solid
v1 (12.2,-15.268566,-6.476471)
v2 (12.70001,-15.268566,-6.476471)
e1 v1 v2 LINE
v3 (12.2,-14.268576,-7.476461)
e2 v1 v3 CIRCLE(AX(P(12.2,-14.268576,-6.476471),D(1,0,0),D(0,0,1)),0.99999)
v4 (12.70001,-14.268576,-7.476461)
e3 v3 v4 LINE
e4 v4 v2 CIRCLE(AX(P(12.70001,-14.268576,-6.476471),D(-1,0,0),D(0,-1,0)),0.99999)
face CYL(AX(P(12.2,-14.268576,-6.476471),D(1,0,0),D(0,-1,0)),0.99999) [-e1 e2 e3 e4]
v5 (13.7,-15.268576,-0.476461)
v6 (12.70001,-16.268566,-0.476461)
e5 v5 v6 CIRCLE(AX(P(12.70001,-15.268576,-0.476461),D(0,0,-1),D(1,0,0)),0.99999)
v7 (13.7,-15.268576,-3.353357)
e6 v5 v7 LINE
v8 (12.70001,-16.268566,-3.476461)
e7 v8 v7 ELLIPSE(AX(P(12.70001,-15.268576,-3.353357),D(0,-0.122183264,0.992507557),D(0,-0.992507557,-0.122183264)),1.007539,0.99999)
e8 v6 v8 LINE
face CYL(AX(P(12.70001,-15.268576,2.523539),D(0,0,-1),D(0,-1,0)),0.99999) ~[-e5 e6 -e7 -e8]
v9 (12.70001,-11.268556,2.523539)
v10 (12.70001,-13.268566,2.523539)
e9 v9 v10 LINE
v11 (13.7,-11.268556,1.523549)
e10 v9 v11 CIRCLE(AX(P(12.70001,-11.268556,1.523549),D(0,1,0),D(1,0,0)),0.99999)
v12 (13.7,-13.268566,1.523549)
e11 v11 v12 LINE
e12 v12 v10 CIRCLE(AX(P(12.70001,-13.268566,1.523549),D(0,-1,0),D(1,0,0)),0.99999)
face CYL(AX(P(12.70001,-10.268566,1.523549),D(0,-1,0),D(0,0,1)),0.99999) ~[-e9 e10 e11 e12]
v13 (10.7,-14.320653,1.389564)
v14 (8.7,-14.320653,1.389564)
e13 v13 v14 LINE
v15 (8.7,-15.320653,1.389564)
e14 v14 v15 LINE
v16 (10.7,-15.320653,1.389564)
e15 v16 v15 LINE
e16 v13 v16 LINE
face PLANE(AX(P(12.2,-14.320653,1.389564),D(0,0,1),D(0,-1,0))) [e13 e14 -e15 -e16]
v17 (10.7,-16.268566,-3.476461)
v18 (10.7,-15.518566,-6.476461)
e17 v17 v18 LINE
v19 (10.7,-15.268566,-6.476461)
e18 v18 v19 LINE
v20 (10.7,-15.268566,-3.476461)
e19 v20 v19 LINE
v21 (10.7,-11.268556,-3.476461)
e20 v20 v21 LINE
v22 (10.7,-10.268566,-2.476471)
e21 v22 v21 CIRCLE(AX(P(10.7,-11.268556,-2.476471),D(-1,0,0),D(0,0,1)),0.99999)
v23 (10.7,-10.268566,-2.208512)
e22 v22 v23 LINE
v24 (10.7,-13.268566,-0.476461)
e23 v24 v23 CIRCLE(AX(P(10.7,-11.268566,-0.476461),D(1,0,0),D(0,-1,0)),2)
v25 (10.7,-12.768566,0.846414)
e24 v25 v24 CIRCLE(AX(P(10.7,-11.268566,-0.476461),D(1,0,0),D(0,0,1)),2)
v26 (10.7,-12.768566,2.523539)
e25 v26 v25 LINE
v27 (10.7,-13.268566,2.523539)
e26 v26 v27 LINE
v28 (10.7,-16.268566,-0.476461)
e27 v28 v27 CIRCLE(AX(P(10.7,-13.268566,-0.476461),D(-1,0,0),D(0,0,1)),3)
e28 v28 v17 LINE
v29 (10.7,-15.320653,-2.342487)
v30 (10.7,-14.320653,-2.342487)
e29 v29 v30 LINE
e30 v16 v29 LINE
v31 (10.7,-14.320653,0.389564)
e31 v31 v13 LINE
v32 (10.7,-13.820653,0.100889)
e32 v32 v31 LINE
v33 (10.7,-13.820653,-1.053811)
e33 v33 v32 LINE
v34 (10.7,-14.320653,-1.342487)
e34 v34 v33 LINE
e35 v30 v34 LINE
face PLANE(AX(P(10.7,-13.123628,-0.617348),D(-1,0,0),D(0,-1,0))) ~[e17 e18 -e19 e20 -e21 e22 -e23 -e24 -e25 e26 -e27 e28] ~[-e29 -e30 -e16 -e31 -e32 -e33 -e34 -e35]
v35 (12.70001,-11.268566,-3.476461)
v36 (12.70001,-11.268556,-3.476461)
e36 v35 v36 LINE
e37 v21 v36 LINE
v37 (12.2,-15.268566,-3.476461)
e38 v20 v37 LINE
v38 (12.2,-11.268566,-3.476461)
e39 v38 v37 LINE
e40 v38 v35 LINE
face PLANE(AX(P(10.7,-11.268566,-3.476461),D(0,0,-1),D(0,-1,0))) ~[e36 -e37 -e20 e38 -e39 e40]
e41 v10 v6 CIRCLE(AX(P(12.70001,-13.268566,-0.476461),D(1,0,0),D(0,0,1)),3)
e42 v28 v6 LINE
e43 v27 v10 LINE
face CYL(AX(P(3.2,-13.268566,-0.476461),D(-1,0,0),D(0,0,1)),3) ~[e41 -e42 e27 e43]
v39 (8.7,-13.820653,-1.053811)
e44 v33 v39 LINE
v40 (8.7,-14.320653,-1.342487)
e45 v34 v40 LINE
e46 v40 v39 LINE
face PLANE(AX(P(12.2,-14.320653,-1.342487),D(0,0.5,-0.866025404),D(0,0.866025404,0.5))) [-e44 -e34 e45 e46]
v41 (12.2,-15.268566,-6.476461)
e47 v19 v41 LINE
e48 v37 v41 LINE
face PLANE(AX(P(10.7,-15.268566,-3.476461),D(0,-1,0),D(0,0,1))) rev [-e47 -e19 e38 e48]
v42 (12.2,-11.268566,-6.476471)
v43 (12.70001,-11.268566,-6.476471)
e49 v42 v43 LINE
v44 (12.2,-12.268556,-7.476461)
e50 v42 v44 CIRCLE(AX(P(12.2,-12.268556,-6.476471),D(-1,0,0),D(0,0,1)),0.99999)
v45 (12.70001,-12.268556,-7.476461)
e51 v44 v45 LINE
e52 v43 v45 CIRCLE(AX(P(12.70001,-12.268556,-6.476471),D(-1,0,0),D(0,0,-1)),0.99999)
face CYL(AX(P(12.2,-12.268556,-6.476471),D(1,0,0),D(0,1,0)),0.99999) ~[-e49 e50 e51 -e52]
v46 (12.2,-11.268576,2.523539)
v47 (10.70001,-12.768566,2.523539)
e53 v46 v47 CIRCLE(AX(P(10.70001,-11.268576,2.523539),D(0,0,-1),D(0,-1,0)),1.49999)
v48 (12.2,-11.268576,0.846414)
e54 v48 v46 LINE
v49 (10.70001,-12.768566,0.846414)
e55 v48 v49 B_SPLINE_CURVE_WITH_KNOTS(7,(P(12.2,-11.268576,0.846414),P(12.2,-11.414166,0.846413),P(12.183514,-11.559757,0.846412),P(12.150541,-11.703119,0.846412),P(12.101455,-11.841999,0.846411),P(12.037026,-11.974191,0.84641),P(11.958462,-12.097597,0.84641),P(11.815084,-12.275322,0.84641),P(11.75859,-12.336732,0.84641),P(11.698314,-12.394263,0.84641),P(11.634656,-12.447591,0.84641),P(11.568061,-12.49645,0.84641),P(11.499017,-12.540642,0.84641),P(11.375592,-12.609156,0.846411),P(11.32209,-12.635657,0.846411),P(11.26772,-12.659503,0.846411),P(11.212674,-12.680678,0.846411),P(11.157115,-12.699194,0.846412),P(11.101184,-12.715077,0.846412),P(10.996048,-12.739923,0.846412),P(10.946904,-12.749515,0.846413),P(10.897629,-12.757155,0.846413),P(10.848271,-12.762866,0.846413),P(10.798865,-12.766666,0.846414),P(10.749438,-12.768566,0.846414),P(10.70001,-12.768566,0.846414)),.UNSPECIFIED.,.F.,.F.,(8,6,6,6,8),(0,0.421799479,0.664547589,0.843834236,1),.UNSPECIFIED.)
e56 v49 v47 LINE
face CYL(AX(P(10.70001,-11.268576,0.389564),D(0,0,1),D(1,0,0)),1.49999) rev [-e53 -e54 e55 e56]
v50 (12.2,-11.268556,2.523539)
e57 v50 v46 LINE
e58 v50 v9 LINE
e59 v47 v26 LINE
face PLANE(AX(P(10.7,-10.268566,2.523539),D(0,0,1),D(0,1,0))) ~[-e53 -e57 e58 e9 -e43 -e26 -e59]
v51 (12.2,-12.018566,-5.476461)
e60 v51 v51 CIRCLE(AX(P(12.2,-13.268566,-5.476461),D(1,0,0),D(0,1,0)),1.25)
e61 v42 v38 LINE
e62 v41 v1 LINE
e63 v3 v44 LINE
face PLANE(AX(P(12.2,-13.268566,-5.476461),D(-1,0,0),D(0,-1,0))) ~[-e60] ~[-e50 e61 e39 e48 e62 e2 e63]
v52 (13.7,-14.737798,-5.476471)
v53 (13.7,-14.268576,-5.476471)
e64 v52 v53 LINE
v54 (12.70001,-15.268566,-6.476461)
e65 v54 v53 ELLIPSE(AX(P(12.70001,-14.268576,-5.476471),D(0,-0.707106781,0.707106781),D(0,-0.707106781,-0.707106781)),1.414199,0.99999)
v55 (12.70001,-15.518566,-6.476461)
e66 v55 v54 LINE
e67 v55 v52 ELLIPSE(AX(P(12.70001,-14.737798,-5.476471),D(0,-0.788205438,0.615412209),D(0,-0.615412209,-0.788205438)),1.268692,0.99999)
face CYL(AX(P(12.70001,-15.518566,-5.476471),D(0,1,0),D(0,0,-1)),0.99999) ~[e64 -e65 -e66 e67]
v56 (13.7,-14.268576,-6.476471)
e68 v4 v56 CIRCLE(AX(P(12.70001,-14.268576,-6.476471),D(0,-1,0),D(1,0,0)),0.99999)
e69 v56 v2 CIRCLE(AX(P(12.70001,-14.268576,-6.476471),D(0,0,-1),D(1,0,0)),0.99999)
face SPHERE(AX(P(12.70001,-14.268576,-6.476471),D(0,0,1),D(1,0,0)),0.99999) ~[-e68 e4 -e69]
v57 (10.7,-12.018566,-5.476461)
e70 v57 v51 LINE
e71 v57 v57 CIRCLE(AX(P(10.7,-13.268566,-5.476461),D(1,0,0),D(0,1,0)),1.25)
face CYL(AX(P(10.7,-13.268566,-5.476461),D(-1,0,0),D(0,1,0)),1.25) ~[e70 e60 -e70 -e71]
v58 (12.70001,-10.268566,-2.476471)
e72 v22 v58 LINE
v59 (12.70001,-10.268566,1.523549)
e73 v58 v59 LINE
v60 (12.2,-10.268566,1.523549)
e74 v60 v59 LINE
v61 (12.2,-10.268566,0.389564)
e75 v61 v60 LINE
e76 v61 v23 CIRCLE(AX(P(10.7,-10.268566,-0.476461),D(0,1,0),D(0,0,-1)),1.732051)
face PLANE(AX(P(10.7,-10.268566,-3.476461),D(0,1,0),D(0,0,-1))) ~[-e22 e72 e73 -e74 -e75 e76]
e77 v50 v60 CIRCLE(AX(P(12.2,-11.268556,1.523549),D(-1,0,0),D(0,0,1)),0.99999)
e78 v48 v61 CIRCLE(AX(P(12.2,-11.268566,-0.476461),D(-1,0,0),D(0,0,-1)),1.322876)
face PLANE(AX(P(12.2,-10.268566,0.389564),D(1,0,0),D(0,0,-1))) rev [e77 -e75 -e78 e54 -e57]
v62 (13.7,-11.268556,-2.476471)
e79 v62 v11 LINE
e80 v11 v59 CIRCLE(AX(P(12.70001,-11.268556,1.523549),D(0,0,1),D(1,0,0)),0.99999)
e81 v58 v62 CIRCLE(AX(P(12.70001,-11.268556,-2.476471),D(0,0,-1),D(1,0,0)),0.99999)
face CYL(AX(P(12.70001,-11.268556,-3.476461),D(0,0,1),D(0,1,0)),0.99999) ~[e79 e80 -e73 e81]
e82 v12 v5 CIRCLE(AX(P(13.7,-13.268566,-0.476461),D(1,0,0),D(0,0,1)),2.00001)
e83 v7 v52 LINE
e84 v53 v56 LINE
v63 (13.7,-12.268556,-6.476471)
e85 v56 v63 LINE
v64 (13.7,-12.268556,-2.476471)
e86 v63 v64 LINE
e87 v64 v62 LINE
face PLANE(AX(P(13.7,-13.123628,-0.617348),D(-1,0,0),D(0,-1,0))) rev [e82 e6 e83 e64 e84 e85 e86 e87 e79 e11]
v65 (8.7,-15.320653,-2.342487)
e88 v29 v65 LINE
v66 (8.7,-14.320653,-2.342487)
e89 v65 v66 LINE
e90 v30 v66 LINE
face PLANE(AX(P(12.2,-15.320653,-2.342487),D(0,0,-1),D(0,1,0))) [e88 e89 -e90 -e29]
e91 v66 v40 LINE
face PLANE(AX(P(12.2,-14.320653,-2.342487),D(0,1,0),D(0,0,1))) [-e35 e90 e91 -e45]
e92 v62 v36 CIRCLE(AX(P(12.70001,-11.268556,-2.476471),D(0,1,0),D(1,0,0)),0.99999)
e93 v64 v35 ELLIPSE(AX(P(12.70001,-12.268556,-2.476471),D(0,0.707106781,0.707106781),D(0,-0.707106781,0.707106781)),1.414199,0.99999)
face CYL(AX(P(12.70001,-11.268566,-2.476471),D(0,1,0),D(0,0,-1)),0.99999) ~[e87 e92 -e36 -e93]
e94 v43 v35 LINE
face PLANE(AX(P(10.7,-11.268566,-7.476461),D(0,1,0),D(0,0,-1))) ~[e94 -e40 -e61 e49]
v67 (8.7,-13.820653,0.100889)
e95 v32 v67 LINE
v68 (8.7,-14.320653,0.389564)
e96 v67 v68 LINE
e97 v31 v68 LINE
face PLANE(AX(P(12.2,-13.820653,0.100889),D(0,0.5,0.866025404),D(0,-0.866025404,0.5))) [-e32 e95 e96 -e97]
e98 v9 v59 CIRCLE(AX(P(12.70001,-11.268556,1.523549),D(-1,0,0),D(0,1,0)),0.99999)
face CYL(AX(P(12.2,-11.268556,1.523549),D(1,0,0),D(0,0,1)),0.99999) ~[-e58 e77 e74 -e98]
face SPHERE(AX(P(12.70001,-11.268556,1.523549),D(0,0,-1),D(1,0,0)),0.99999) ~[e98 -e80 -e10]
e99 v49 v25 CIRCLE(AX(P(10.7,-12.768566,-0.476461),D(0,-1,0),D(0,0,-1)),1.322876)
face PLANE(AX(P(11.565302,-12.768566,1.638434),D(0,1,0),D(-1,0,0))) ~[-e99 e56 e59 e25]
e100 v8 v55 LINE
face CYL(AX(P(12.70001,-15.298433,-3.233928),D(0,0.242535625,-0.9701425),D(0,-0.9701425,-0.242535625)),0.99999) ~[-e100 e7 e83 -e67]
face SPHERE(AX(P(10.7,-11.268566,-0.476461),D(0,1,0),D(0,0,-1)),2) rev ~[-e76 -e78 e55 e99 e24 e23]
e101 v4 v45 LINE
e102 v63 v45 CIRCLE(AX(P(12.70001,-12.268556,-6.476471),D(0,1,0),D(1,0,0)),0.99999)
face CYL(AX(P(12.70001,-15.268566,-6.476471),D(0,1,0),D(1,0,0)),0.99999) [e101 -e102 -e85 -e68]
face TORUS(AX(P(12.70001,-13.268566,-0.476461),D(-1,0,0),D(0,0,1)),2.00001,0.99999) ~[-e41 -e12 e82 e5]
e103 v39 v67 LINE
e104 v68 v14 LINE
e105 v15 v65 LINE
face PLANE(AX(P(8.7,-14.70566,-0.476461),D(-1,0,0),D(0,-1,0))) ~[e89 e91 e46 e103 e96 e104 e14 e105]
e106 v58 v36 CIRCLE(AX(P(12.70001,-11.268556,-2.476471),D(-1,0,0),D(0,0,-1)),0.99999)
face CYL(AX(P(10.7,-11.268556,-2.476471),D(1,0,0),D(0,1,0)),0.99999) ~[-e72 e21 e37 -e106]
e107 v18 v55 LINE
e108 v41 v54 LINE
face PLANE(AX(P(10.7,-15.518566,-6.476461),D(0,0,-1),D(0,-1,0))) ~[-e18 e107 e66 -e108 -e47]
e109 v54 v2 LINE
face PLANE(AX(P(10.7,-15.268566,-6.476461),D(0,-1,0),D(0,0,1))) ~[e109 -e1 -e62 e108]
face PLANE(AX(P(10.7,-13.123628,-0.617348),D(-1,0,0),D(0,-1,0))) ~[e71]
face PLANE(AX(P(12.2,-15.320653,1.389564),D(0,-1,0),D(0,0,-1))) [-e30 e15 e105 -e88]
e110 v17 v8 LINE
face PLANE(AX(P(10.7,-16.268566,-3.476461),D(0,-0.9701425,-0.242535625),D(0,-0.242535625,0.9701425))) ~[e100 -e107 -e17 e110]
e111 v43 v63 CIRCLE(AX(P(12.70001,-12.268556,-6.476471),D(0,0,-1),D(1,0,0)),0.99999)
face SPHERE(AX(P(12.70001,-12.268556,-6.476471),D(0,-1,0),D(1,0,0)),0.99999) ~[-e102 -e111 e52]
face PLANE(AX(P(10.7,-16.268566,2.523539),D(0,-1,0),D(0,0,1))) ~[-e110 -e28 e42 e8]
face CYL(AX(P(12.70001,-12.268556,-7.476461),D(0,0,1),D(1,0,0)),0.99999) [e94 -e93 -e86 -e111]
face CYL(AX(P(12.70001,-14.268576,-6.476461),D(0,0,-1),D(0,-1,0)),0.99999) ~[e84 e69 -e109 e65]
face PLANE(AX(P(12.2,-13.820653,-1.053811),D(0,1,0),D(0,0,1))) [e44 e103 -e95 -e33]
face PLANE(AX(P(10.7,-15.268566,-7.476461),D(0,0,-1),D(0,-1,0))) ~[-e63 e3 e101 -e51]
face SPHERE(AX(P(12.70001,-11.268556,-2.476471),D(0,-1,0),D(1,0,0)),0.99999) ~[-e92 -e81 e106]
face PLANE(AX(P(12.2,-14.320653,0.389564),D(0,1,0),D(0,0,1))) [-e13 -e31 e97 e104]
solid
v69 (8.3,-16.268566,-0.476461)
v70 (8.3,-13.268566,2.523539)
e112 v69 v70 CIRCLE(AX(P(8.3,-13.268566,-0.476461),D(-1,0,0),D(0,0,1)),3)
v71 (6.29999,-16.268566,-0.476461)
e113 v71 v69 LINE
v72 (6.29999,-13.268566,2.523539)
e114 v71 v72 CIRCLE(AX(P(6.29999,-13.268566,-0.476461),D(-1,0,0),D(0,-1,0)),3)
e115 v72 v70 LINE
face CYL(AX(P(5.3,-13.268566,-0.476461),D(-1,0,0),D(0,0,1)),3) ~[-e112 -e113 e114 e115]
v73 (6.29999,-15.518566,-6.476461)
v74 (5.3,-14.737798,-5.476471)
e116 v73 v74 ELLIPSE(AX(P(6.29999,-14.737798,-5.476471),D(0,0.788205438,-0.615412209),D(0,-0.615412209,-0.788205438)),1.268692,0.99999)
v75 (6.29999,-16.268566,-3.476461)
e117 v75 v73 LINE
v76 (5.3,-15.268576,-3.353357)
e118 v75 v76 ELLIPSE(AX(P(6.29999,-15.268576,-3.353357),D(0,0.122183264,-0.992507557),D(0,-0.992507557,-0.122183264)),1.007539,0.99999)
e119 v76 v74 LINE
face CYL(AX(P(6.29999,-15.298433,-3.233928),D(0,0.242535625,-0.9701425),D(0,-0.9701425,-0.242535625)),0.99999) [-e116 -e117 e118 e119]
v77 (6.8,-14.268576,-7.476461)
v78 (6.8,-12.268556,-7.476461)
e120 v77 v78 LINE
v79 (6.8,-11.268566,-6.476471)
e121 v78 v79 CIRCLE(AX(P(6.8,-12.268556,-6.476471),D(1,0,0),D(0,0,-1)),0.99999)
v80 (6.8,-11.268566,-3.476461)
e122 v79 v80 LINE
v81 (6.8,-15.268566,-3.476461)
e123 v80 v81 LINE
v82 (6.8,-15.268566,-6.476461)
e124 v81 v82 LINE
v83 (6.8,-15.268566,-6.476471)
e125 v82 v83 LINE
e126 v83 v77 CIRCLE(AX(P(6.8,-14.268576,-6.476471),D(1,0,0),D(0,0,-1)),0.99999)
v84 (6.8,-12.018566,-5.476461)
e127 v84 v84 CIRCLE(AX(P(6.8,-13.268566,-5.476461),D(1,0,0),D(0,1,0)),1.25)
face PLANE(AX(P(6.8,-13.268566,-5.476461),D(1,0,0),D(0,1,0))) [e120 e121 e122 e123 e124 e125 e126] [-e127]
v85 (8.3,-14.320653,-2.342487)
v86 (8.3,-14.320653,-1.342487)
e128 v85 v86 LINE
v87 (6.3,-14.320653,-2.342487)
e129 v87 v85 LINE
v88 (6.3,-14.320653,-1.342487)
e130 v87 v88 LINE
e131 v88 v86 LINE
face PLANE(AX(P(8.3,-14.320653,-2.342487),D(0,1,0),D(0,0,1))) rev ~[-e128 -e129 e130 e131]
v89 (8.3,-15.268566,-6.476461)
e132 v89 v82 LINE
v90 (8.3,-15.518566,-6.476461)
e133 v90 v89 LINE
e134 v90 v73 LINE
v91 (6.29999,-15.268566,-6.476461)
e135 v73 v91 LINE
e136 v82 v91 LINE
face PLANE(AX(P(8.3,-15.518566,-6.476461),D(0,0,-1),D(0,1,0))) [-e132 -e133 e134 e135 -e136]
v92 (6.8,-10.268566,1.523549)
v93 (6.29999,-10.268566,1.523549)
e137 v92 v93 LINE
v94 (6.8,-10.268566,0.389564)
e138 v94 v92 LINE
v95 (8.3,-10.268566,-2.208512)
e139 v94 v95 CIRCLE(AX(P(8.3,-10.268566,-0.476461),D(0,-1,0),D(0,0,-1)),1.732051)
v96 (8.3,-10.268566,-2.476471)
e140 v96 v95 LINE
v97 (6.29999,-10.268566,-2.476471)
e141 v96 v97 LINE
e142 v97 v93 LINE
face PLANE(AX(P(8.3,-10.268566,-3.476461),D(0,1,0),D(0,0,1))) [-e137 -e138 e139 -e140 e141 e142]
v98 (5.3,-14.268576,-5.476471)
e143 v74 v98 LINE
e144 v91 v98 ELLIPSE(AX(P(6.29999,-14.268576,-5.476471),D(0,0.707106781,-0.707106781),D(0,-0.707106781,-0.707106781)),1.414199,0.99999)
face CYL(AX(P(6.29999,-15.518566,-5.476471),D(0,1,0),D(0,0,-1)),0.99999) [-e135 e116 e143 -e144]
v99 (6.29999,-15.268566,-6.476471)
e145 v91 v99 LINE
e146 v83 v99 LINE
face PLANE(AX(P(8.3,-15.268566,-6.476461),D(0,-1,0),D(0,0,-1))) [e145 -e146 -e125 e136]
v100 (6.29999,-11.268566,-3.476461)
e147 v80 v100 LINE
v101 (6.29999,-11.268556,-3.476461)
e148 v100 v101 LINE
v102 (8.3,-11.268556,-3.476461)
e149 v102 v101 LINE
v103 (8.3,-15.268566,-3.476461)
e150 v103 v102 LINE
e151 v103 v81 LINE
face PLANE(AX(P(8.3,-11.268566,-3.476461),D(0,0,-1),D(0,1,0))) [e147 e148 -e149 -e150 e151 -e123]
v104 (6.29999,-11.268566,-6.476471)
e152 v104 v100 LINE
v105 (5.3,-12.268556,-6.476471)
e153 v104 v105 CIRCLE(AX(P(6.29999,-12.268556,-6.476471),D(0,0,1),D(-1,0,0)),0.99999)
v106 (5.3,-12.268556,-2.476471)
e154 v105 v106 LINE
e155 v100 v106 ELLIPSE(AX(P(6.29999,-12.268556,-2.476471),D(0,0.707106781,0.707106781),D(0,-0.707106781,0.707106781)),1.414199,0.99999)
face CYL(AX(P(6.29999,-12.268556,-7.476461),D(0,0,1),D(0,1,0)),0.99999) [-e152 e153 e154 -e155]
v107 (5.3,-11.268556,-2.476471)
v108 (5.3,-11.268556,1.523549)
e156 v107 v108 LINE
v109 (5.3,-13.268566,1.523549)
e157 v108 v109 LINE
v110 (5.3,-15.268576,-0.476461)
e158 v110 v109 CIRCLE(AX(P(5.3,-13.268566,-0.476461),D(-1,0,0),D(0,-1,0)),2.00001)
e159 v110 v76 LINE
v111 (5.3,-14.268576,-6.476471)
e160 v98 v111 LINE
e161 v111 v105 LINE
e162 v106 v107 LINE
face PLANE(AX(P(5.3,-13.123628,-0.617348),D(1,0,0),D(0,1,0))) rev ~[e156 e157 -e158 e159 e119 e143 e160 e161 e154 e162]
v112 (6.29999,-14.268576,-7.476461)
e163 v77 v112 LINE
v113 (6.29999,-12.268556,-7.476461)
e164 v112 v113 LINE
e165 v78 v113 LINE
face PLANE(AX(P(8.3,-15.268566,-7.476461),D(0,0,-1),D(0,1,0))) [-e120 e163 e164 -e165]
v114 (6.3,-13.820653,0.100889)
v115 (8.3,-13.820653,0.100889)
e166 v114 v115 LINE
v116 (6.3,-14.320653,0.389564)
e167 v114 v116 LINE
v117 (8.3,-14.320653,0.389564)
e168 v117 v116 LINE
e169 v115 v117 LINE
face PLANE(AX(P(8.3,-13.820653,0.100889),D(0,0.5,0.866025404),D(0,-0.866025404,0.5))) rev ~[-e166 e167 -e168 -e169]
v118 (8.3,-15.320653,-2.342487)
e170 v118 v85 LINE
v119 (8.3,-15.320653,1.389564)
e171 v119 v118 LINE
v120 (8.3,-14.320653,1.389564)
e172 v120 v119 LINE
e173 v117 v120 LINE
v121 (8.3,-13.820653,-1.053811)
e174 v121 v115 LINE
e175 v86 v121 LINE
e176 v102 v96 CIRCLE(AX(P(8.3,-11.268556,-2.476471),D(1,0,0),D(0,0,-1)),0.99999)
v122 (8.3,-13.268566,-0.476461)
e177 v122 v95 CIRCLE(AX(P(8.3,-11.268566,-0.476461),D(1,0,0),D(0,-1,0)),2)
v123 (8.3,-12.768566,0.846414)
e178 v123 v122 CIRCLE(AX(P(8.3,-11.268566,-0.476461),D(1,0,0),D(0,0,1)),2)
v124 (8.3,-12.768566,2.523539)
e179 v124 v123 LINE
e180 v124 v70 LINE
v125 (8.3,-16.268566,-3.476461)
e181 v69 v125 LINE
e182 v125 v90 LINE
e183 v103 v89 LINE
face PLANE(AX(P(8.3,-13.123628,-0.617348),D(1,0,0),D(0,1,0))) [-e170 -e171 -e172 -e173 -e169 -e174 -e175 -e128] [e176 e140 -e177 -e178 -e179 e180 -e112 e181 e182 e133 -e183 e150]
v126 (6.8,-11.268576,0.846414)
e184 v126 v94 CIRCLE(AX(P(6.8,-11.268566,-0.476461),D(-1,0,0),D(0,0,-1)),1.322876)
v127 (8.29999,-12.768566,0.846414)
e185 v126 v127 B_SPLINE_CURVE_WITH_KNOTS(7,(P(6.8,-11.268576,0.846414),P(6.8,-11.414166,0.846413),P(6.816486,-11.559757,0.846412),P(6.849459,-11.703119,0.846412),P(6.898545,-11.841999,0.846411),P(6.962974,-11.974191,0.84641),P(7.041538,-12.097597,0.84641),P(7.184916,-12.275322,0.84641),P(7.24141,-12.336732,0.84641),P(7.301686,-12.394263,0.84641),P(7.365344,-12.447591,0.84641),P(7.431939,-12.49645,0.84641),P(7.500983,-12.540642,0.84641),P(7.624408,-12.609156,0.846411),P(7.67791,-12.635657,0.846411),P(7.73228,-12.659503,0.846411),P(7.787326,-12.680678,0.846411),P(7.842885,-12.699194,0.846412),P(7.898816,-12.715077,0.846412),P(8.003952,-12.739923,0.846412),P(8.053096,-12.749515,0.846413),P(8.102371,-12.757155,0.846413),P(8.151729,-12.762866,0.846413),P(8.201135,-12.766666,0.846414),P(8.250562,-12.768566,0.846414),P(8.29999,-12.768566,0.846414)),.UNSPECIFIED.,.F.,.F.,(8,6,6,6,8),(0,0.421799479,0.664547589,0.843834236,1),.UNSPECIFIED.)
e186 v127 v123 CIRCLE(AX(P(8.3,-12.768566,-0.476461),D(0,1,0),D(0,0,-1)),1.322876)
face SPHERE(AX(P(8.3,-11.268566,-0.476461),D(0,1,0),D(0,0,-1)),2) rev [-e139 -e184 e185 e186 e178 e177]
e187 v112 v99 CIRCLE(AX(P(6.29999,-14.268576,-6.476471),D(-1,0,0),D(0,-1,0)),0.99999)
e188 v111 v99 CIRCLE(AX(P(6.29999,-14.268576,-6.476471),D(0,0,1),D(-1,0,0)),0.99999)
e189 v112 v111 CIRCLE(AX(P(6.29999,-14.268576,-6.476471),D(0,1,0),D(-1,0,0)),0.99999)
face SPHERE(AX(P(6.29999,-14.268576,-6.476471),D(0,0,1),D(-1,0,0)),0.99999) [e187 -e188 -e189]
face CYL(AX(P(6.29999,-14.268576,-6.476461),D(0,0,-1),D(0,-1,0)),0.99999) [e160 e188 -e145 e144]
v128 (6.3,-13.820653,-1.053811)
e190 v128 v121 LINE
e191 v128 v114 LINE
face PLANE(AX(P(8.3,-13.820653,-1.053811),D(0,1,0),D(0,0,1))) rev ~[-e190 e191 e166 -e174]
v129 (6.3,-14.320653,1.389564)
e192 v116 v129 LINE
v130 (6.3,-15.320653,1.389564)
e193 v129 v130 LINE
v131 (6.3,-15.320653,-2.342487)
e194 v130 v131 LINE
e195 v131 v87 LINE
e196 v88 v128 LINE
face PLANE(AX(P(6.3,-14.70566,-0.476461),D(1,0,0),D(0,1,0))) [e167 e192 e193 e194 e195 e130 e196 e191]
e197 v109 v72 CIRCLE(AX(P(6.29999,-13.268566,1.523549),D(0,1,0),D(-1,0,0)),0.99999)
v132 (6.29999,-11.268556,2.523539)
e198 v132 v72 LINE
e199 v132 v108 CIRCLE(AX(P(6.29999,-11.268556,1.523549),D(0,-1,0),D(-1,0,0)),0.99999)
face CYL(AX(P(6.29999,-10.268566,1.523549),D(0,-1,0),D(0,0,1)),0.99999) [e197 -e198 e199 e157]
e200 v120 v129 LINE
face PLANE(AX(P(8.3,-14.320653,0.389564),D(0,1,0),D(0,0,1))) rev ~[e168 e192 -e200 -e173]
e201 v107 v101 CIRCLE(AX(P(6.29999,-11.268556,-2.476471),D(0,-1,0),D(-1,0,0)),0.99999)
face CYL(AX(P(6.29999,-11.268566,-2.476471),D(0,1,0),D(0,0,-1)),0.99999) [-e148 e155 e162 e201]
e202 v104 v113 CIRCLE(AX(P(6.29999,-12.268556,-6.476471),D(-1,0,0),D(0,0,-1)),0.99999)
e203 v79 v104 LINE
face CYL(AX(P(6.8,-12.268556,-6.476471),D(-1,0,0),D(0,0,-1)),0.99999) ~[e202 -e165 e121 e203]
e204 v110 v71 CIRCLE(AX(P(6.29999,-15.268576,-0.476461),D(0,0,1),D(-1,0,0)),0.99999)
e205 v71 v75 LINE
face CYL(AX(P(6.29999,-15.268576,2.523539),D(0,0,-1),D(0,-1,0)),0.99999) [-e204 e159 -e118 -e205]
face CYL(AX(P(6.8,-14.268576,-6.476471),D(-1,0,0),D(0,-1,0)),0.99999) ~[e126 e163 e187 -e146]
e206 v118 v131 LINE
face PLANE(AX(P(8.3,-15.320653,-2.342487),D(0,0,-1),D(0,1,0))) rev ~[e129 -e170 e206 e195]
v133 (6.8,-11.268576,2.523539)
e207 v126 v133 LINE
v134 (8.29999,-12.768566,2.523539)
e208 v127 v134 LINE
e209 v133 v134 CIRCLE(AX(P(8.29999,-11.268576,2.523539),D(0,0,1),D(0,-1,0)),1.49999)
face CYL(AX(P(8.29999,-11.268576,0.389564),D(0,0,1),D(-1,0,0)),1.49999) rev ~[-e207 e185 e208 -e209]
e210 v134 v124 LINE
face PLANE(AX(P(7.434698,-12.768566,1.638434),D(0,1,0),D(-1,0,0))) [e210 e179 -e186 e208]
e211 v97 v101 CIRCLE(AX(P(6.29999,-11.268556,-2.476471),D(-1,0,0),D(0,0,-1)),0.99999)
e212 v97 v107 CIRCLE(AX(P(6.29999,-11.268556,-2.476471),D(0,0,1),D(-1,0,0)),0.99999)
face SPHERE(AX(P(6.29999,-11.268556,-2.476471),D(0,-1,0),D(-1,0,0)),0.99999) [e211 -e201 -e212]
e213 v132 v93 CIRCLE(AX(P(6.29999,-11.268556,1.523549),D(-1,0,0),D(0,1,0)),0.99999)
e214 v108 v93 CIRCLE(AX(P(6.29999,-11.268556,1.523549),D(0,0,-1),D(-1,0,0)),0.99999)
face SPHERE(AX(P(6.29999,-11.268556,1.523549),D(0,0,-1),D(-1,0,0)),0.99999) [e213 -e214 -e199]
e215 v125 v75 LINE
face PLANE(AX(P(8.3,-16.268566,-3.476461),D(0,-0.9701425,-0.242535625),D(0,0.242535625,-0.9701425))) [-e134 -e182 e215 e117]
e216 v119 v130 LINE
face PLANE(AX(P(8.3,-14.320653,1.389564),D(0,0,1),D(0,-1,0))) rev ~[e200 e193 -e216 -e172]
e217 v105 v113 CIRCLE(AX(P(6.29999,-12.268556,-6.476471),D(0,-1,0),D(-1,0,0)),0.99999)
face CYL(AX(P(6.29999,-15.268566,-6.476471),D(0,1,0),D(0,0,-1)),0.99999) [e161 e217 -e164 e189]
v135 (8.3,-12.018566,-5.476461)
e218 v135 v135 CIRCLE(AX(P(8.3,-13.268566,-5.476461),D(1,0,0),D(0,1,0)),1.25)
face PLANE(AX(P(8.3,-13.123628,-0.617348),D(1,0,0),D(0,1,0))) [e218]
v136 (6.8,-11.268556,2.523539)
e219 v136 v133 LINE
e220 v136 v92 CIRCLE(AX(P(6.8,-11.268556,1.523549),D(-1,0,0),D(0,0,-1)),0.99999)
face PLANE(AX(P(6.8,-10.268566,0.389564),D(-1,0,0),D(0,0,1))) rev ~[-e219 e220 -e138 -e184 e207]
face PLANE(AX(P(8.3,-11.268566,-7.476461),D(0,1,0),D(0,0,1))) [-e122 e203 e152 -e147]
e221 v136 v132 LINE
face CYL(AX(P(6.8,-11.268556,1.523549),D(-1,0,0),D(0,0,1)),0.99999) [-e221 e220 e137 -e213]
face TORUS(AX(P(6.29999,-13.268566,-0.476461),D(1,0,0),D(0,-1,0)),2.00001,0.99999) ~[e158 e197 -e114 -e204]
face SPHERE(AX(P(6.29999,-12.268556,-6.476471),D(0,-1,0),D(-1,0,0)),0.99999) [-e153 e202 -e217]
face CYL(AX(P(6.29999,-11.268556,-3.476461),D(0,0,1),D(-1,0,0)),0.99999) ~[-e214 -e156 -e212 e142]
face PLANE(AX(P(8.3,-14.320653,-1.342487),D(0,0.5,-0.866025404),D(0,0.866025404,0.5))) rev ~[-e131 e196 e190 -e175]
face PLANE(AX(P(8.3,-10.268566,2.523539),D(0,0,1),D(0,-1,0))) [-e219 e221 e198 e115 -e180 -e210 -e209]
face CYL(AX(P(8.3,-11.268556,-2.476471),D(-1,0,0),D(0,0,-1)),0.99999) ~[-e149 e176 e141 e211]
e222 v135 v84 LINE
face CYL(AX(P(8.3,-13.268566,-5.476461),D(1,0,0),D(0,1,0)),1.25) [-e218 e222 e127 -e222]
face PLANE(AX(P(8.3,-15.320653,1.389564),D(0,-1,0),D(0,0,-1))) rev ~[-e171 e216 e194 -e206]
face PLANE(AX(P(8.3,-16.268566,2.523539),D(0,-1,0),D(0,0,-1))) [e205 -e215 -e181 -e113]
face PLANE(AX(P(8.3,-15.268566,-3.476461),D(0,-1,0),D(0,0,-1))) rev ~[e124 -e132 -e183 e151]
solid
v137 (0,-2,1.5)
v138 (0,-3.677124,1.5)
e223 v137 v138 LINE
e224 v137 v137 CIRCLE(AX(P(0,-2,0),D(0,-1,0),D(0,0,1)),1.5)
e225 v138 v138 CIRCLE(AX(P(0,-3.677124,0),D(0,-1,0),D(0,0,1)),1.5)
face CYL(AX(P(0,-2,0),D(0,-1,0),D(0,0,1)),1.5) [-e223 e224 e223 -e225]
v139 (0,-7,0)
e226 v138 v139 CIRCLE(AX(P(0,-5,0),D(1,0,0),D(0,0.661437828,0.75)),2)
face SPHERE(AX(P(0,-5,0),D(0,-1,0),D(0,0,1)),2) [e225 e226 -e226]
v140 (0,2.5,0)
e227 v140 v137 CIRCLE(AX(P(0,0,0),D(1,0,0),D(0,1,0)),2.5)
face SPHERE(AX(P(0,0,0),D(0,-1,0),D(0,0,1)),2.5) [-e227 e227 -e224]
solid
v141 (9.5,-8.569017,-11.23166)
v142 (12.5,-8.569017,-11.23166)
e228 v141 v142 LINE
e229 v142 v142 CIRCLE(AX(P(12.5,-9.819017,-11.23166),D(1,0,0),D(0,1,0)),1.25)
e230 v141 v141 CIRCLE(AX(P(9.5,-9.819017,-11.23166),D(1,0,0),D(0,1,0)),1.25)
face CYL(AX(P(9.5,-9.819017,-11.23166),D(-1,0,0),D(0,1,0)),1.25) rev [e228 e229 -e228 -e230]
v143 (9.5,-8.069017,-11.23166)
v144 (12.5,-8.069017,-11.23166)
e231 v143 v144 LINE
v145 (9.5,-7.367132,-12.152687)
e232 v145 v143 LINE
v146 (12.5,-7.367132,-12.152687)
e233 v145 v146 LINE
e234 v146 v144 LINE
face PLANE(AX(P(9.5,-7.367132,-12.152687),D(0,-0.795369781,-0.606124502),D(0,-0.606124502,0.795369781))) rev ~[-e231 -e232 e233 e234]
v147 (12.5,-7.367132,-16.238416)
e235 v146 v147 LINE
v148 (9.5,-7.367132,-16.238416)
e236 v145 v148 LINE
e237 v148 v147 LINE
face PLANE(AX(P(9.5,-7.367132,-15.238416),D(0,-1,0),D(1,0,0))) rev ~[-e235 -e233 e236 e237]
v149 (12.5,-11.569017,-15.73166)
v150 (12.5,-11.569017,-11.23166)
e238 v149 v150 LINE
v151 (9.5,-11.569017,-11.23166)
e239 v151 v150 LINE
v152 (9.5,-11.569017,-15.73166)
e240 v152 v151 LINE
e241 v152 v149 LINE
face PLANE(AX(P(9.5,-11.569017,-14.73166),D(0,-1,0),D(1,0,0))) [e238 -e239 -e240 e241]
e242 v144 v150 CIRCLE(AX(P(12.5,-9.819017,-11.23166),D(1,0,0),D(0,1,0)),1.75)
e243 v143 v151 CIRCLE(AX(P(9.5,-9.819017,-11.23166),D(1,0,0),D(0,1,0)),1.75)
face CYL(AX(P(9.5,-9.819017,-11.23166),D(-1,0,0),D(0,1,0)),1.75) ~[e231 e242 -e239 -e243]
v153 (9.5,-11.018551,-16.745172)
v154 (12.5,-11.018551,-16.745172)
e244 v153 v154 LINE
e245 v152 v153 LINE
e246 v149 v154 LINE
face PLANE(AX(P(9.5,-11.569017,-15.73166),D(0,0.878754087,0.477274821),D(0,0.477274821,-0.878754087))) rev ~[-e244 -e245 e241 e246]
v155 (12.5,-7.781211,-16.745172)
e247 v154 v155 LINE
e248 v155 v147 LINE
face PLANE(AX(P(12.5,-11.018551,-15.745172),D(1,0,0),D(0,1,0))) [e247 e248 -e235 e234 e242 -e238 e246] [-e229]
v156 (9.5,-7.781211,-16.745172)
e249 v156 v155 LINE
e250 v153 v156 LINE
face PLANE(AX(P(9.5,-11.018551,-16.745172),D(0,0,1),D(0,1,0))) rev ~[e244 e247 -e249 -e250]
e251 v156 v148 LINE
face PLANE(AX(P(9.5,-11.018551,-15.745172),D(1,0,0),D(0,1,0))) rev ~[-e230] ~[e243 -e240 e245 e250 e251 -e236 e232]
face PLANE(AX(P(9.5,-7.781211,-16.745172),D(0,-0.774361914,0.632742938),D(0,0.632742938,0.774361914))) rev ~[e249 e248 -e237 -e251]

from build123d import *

# Parameters (mm, degrees)
F3_R           = 1.25
F4_DEPTH       = 3
F5_DEPTH       = 1.5
F9_DEPTH       = 2.5
F10_R          = 1.49999
F12_DEPTH      = 3.5
F13_DEPTH      = 0.5
F14_R          = 0.99999
F14_2_R        = 0.99999
F15_R          = 1.25
F16_DEPTH      = 3
F17_DEPTH      = 1
F18_T1_DEPTH   = 10.5
F18_T4_ANGLE   = 90
F18_2_T1_DEPTH = 10.5
F18_2_T4_ANGLE = 90


# Not quite as in the source:
# - a fillet or chamfer that OpenCascade refuses, or shapes differently, is made with other operations: its cross-section is extruded or revolved along the edge and cut away or added
# - a fillet or chamfer is up to 0.001 mm smaller than in the source, because OpenCascade refuses the exact size


with BuildPart() as f1:
    # F0 (on Right) → F1 (revolve)
    with BuildSketch(Plane.YZ):
        with BuildLine():
            Line((-5, 0), (2.5, 0))
            ThreePointArc((2.5, 0), (0.790569415, 2.3717082451), (-2, 1.5))
            Line((-2, 1.5), (-3.6771243445, 1.5))
            Line((-3.6771243445, 1.5), (-5, 1.5))
            Line((-5, 1.5), (-5, 0))
        make_face()
        with BuildLine():
            Line((-7, 0), (-5, 0))
            Line((-5, 0), (-5, 1.5))
            Line((-5, 1.5), (-3.6771243445, 1.5))
            ThreePointArc((-3.6771243445, 1.5), (-5.8228756555, 1.8228756555), (-7, 0))
        make_face()
    revolve(axis=Axis((0, -2.25, 0), (0, -1, 0)))


with BuildPart() as f4:
    # F3 (on offset) → F4 (new body)
    with BuildSketch(Plane.YZ.offset(8.3)):
        with BuildLine():
            Line((-10.2685662508, -0.4764611628), (-10.2685662508, 2.5235388372))
            Line((-10.2685662508, 2.5235388372), (-16.2685662508, 2.5235388372))
            Line((-16.2685662508, 2.5235388372), (-16.2685662508, -3.4764611628))
            Line((-16.2685662508, -3.4764611628), (-15.2685662508, -3.4764611628))
            Line((-15.2685662508, -3.4764611628), (-11.2685662508, -3.4764611628))
            Line((-11.2685662508, -3.4764611628), (-10.2685662508, -3.4764611628))
            Line((-10.2685662508, -3.4764611628), (-10.2685662508, -2.2085119704))
            ThreePointArc((-10.2685662508, -2.2085119704), (-12.2685662508, -2.2085119704), (-13.2685662508, -0.4764611628))
            Line((-13.2685662508, -0.4764611628), (-10.2685662508, -0.4764611628))
        make_face()
        Polygon((-14.3206530139, 1.389564241), (-14.3206530139, 0.389564241), (-13.8206530139, 0.1008891064), (-13.8206530139, -1.053811432), (-14.3206530139, -1.3424865666), (-14.3206530139, -2.3424865666), (-15.3206530139, -2.3424865666), (-15.3206530139, -1.3424865666), (-15.3206530139, 0.389564241), (-15.3206530139, 1.389564241), align=None, mode=Mode.SUBTRACT)
        Polygon((-11.2685662508, -3.4764611628), (-15.2685662508, -3.4764611628), (-15.2685662508, -6.4764611628), (-15.2685662508, -7.4764611628), (-11.2685662508, -7.4764611628), align=None)
        with Locations((-13.2685662508, -5.4764611628)):
            Circle(F3_R, mode=Mode.SUBTRACT)
        with BuildLine():
            Line((-10.2685662508, -2.2085119704), (-10.2685662508, -0.4764611628))
            Line((-10.2685662508, -0.4764611628), (-13.2685662508, -0.4764611628))
            ThreePointArc((-13.2685662508, -0.4764611628), (-12.2685662508, -2.2085119704), (-10.2685662508, -2.2085119704))
        make_face()
        with Locations((-13.2685662508, -5.4764611628)):
            Circle(F3_R)
        Polygon((-13.8206530139, 0.1008891064), (-14.3206530139, 0.389564241), (-14.3206530139, 1.389564241), (-15.3206530139, 1.389564241), (-15.3206530139, 0.389564241), (-15.3206530139, -1.3424865666), (-15.3206530139, -2.3424865666), (-14.3206530139, -2.3424865666), (-14.3206530139, -1.3424865666), (-13.8206530139, -1.053811432), align=None)
        Polygon((-15.2685662508, -3.4764611628), (-16.2685662508, -3.4764611628), (-15.5185662508, -6.4764611628), (-15.2685662508, -6.4764611628), align=None)
    extrude(amount=-F4_DEPTH)

    # F3 (on offset) → F5 (cut)
    with BuildSketch(Plane.YZ.offset(8.3)):
        Polygon((-11.2685662508, -3.4764611628), (-15.2685662508, -3.4764611628), (-15.2685662508, -6.4764611628), (-15.2685662508, -7.4764611628), (-11.2685662508, -7.4764611628), align=None)
        with Locations((-13.2685662508, -5.4764611628)):
            Circle(F3_R, mode=Mode.SUBTRACT)
        Polygon((-13.8206530139, 0.1008891064), (-14.3206530139, 0.389564241), (-14.3206530139, 1.389564241), (-15.3206530139, 1.389564241), (-15.3206530139, 0.389564241), (-15.3206530139, -1.3424865666), (-15.3206530139, -2.3424865666), (-14.3206530139, -2.3424865666), (-14.3206530139, -1.3424865666), (-13.8206530139, -1.053811432), align=None)
    extrude(amount=-F5_DEPTH, mode=Mode.SUBTRACT)

    # F3 (on offset) → F6 (revolve, cut)
    with BuildSketch(Plane.YZ.offset(8.3)):
        with BuildLine():
            Line((-10.2685662508, -2.2085119704), (-10.2685662508, -0.4764611628))
            Line((-10.2685662508, -0.4764611628), (-13.2685662508, -0.4764611628))
            ThreePointArc((-13.2685662508, -0.4764611628), (-12.2685662508, -2.2085119704), (-10.2685662508, -2.2085119704))
        make_face()
    revolve(axis=Axis((8.3, -11.2685662508, -0.4764611628), (0, -1, 0)), mode=Mode.SUBTRACT)

    # F8 (on face) → F9 (cut)
    with BuildSketch(Plane(origin=(0, -10.2685662508, 0), x_dir=(-1, 0, 0), z_dir=(0, 1, 0))):
        with BuildLine():
            ThreePointArc((-8.3, 1.2555896448), (-7.4339745962, 1.0235388372), (-6.8, 0.389564241))
            Line((-6.8, 0.389564241), (-6.8, 2.5235388372))
            Line((-6.8, 2.5235388372), (-8.3, 2.5235388372))
            Line((-8.3, 2.5235388372), (-8.3, 1.2555896448))
        make_face()
        with BuildLine():
            Line((-8.3, 0.389564241), (-6.8, 0.389564241))
            ThreePointArc((-6.8, 0.389564241), (-7.4339745962, 1.0235388372), (-8.3, 1.2555896448))
            Line((-8.3, 1.2555896448), (-8.3, 0.389564241))
        make_face()
    extrude(amount=-F9_DEPTH, mode=Mode.SUBTRACT)

    # F10 (radius 1.5 in the source; OpenCascade refuses exactly that, so slightly less here)
    f10_edges = [f4.edges().sort_by_distance(p)[0] for p in [
        (6.8, -12.768566, 1.456552),
    ]]
    fillet(f10_edges, radius=F10_R)


with BuildPart() as f11_1:
    # F11: instance of F4
    add(f4.part.mirror(Plane.YZ.offset(9.5)))

    # F12 (add): a face of the model
    f12_faces = [f11_1.faces().sort_by_distance(p)[0] for p in [
        (12.2, -14.7018230175, -0.4764611628),
    ]]
    extrude(f12_faces, amount=F12_DEPTH)

    # F14#2 (radius 1 in the source; OpenCascade refuses exactly that, so slightly less here)
    f14_2_edges = [f11_1.edges().sort_by_distance(p)[0] for p in [
        (13.7, -15.268566, -6.976461),
        (13.7, -13.268566, -7.476461),
        (13.7, -11.268566, -5.476461),
        (13.7, -10.768566, -3.476461),
        (13.7, -10.268566, -0.476461),
        (13.7, -13.268566, 2.523539),
        (13.7, -16.268566, -0.476461),
        (13.7, -15.893566, -4.976461),
        (13.7, -15.393566, -6.476461),
        (12.95, -10.268566, 2.523539),
        (12.2, -10.268566, -3.476461),
        (12.95, -11.268566, -7.476461),
        (12.95, -15.268566, -7.476461),
    ]]
    fillet(f14_2_edges, radius=F14_2_R)

    # F18#2: fillet of radius 3 on 1 edges, made by hand

    # F18_2_s2 → F18_2_t1 (cut)
    with BuildSketch(Plane.YZ.offset(3.2)):
        with BuildLine():
            ThreePointArc((-13.2685662508, 2.5235388372), (-15.3898865944, 1.6448591808), (-16.2685662508, -0.4764611628))
            Line((-16.2685662508, -0.4764611628), (-16.2685662508, 2.5235388372))
            Line((-16.2685662508, 2.5235388372), (-13.2685662508, 2.5235388372))
        make_face()
    extrude(amount=F18_2_T1_DEPTH, mode=Mode.SUBTRACT)

    # F18_2_s3 → F18_2_t4 (revolve, cut)
    with BuildSketch(Plane.XZ.offset(13.2685662508)):
        with BuildLine():
            ThreePointArc((13.7, 1.5235488372), (13.4071097101, 2.2306485473), (12.70001, 2.5235388372))
            Line((12.70001, 2.5235388372), (13.7, 2.5235388372))
            Line((13.7, 2.5235388372), (13.7, 1.5235488372))
        make_face()
    revolve(axis=Axis((13.7, -13.2685662508, -0.4764611628), (1, 0, 0)), revolution_arc=F18_2_T4_ANGLE, mode=Mode.SUBTRACT)


with BuildPart() as f4_1:
    add(f4.part)

    # F13 (cut): a face of the model
    f13_faces = [f4_1.faces().sort_by_distance(p)[0] for p in [
        (6.8, -14.7018230175, -0.4764611628),
    ]]
    extrude(f13_faces, amount=-F13_DEPTH, mode=Mode.SUBTRACT)

    # F14 (radius 1 in the source; OpenCascade refuses exactly that, so slightly less here)
    f14_edges = [f4_1.edges().sort_by_distance(p)[0] for p in [
        (5.3, -15.268566, -6.976461),
        (5.3, -13.268566, -7.476461),
        (5.3, -11.268566, -5.476461),
        (5.3, -10.768566, -3.476461),
        (5.3, -10.268566, -0.476461),
        (5.3, -13.268566, 2.523539),
        (5.3, -16.268566, -0.476461),
        (5.3, -15.893566, -4.976461),
        (5.3, -15.393566, -6.476461),
        (6.05, -10.268566, 2.523539),
        (6.8, -10.268566, -3.476461),
        (6.05, -15.268566, -7.476461),
        (6.05, -11.268566, -7.476461),
    ]]
    fillet(f14_edges, radius=F14_R)

    # F18: fillet of radius 3 on 1 edges, made by hand

    # F18_s2 → F18_t1 (cut)
    with BuildSketch(Plane.YZ.offset(5.3)):
        with BuildLine():
            ThreePointArc((-13.2685662508, 2.5235388372), (-15.3898865944, 1.6448591808), (-16.2685662508, -0.4764611628))
            Line((-16.2685662508, -0.4764611628), (-16.2685662508, 2.5235388372))
            Line((-16.2685662508, 2.5235388372), (-13.2685662508, 2.5235388372))
        make_face()
    extrude(amount=F18_T1_DEPTH, mode=Mode.SUBTRACT)

    # F18_s3 → F18_t4 (revolve, cut)
    with BuildSketch(Plane.XY.offset(-0.4764611628)):
        with BuildLine():
            ThreePointArc((5.3, -15.2685762508), (5.5928902899, -15.9756759609), (6.29999, -16.2685662508))
            Line((6.29999, -16.2685662508), (5.3, -16.2685662508))
            Line((5.3, -16.2685662508), (5.3, -15.2685762508))
        make_face()
    revolve(axis=Axis((5.3, -13.2685662508, -0.4764611628), (-1, 0, 0)), revolution_arc=F18_T4_ANGLE, mode=Mode.SUBTRACT)


with BuildPart() as f16:
    # F15 (on offset) → F16 (new body)
    with BuildSketch(Plane.YZ.offset(9.5)):
        with BuildLine():
            ThreePointArc((-11.5690167919, -11.2316595539), (-9.8190167919, -12.9816595539), (-8.0690167919, -11.2316595539))
            ThreePointArc((-8.0690167919, -11.2316595539), (-9.8190167919, -9.4816595539), (-11.5690167919, -11.2316595539))
        make_face()
        with Locations((-9.8190167919, -11.2316595539)):
            Circle(F15_R, mode=Mode.SUBTRACT)
        with BuildLine():
            Line((-7.3671324644, -12.1526874641), (-8.0690167919, -11.2316595539))
            ThreePointArc((-8.0690167919, -11.2316595539), (-9.8190167919, -12.9816595539), (-11.5690167919, -11.2316595539))
            Line((-11.5690167919, -11.2316595539), (-11.5690167919, -14.7316595539))
            Line((-11.5690167919, -14.7316595539), (-11.0185509548, -15.7451722771))
            Line((-11.0185509548, -15.7451722771), (-7.7812108211, -15.7451722771))
            Line((-7.7812108211, -15.7451722771), (-7.3671324644, -15.2384159155))
            Line((-7.3671324644, -15.2384159155), (-7.3671324644, -12.1526874641))
        make_face()
    extrude(amount=F16_DEPTH)

    # F17 (add): faces of the model
    f17_faces = [f16.faces().sort_by_distance(p)[0] for p in [
        (11, -9.3998808879, -15.7451722771),
        (11, -11.2937838733, -15.2384159155),
        (11, -7.5741716428, -15.4917940963),
    ]]
    extrude(f17_faces, amount=F17_DEPTH, dir=(0, 0, -1))


solid = Compound([f1.part, f11_1.part, f4_1.part, f16.part])
